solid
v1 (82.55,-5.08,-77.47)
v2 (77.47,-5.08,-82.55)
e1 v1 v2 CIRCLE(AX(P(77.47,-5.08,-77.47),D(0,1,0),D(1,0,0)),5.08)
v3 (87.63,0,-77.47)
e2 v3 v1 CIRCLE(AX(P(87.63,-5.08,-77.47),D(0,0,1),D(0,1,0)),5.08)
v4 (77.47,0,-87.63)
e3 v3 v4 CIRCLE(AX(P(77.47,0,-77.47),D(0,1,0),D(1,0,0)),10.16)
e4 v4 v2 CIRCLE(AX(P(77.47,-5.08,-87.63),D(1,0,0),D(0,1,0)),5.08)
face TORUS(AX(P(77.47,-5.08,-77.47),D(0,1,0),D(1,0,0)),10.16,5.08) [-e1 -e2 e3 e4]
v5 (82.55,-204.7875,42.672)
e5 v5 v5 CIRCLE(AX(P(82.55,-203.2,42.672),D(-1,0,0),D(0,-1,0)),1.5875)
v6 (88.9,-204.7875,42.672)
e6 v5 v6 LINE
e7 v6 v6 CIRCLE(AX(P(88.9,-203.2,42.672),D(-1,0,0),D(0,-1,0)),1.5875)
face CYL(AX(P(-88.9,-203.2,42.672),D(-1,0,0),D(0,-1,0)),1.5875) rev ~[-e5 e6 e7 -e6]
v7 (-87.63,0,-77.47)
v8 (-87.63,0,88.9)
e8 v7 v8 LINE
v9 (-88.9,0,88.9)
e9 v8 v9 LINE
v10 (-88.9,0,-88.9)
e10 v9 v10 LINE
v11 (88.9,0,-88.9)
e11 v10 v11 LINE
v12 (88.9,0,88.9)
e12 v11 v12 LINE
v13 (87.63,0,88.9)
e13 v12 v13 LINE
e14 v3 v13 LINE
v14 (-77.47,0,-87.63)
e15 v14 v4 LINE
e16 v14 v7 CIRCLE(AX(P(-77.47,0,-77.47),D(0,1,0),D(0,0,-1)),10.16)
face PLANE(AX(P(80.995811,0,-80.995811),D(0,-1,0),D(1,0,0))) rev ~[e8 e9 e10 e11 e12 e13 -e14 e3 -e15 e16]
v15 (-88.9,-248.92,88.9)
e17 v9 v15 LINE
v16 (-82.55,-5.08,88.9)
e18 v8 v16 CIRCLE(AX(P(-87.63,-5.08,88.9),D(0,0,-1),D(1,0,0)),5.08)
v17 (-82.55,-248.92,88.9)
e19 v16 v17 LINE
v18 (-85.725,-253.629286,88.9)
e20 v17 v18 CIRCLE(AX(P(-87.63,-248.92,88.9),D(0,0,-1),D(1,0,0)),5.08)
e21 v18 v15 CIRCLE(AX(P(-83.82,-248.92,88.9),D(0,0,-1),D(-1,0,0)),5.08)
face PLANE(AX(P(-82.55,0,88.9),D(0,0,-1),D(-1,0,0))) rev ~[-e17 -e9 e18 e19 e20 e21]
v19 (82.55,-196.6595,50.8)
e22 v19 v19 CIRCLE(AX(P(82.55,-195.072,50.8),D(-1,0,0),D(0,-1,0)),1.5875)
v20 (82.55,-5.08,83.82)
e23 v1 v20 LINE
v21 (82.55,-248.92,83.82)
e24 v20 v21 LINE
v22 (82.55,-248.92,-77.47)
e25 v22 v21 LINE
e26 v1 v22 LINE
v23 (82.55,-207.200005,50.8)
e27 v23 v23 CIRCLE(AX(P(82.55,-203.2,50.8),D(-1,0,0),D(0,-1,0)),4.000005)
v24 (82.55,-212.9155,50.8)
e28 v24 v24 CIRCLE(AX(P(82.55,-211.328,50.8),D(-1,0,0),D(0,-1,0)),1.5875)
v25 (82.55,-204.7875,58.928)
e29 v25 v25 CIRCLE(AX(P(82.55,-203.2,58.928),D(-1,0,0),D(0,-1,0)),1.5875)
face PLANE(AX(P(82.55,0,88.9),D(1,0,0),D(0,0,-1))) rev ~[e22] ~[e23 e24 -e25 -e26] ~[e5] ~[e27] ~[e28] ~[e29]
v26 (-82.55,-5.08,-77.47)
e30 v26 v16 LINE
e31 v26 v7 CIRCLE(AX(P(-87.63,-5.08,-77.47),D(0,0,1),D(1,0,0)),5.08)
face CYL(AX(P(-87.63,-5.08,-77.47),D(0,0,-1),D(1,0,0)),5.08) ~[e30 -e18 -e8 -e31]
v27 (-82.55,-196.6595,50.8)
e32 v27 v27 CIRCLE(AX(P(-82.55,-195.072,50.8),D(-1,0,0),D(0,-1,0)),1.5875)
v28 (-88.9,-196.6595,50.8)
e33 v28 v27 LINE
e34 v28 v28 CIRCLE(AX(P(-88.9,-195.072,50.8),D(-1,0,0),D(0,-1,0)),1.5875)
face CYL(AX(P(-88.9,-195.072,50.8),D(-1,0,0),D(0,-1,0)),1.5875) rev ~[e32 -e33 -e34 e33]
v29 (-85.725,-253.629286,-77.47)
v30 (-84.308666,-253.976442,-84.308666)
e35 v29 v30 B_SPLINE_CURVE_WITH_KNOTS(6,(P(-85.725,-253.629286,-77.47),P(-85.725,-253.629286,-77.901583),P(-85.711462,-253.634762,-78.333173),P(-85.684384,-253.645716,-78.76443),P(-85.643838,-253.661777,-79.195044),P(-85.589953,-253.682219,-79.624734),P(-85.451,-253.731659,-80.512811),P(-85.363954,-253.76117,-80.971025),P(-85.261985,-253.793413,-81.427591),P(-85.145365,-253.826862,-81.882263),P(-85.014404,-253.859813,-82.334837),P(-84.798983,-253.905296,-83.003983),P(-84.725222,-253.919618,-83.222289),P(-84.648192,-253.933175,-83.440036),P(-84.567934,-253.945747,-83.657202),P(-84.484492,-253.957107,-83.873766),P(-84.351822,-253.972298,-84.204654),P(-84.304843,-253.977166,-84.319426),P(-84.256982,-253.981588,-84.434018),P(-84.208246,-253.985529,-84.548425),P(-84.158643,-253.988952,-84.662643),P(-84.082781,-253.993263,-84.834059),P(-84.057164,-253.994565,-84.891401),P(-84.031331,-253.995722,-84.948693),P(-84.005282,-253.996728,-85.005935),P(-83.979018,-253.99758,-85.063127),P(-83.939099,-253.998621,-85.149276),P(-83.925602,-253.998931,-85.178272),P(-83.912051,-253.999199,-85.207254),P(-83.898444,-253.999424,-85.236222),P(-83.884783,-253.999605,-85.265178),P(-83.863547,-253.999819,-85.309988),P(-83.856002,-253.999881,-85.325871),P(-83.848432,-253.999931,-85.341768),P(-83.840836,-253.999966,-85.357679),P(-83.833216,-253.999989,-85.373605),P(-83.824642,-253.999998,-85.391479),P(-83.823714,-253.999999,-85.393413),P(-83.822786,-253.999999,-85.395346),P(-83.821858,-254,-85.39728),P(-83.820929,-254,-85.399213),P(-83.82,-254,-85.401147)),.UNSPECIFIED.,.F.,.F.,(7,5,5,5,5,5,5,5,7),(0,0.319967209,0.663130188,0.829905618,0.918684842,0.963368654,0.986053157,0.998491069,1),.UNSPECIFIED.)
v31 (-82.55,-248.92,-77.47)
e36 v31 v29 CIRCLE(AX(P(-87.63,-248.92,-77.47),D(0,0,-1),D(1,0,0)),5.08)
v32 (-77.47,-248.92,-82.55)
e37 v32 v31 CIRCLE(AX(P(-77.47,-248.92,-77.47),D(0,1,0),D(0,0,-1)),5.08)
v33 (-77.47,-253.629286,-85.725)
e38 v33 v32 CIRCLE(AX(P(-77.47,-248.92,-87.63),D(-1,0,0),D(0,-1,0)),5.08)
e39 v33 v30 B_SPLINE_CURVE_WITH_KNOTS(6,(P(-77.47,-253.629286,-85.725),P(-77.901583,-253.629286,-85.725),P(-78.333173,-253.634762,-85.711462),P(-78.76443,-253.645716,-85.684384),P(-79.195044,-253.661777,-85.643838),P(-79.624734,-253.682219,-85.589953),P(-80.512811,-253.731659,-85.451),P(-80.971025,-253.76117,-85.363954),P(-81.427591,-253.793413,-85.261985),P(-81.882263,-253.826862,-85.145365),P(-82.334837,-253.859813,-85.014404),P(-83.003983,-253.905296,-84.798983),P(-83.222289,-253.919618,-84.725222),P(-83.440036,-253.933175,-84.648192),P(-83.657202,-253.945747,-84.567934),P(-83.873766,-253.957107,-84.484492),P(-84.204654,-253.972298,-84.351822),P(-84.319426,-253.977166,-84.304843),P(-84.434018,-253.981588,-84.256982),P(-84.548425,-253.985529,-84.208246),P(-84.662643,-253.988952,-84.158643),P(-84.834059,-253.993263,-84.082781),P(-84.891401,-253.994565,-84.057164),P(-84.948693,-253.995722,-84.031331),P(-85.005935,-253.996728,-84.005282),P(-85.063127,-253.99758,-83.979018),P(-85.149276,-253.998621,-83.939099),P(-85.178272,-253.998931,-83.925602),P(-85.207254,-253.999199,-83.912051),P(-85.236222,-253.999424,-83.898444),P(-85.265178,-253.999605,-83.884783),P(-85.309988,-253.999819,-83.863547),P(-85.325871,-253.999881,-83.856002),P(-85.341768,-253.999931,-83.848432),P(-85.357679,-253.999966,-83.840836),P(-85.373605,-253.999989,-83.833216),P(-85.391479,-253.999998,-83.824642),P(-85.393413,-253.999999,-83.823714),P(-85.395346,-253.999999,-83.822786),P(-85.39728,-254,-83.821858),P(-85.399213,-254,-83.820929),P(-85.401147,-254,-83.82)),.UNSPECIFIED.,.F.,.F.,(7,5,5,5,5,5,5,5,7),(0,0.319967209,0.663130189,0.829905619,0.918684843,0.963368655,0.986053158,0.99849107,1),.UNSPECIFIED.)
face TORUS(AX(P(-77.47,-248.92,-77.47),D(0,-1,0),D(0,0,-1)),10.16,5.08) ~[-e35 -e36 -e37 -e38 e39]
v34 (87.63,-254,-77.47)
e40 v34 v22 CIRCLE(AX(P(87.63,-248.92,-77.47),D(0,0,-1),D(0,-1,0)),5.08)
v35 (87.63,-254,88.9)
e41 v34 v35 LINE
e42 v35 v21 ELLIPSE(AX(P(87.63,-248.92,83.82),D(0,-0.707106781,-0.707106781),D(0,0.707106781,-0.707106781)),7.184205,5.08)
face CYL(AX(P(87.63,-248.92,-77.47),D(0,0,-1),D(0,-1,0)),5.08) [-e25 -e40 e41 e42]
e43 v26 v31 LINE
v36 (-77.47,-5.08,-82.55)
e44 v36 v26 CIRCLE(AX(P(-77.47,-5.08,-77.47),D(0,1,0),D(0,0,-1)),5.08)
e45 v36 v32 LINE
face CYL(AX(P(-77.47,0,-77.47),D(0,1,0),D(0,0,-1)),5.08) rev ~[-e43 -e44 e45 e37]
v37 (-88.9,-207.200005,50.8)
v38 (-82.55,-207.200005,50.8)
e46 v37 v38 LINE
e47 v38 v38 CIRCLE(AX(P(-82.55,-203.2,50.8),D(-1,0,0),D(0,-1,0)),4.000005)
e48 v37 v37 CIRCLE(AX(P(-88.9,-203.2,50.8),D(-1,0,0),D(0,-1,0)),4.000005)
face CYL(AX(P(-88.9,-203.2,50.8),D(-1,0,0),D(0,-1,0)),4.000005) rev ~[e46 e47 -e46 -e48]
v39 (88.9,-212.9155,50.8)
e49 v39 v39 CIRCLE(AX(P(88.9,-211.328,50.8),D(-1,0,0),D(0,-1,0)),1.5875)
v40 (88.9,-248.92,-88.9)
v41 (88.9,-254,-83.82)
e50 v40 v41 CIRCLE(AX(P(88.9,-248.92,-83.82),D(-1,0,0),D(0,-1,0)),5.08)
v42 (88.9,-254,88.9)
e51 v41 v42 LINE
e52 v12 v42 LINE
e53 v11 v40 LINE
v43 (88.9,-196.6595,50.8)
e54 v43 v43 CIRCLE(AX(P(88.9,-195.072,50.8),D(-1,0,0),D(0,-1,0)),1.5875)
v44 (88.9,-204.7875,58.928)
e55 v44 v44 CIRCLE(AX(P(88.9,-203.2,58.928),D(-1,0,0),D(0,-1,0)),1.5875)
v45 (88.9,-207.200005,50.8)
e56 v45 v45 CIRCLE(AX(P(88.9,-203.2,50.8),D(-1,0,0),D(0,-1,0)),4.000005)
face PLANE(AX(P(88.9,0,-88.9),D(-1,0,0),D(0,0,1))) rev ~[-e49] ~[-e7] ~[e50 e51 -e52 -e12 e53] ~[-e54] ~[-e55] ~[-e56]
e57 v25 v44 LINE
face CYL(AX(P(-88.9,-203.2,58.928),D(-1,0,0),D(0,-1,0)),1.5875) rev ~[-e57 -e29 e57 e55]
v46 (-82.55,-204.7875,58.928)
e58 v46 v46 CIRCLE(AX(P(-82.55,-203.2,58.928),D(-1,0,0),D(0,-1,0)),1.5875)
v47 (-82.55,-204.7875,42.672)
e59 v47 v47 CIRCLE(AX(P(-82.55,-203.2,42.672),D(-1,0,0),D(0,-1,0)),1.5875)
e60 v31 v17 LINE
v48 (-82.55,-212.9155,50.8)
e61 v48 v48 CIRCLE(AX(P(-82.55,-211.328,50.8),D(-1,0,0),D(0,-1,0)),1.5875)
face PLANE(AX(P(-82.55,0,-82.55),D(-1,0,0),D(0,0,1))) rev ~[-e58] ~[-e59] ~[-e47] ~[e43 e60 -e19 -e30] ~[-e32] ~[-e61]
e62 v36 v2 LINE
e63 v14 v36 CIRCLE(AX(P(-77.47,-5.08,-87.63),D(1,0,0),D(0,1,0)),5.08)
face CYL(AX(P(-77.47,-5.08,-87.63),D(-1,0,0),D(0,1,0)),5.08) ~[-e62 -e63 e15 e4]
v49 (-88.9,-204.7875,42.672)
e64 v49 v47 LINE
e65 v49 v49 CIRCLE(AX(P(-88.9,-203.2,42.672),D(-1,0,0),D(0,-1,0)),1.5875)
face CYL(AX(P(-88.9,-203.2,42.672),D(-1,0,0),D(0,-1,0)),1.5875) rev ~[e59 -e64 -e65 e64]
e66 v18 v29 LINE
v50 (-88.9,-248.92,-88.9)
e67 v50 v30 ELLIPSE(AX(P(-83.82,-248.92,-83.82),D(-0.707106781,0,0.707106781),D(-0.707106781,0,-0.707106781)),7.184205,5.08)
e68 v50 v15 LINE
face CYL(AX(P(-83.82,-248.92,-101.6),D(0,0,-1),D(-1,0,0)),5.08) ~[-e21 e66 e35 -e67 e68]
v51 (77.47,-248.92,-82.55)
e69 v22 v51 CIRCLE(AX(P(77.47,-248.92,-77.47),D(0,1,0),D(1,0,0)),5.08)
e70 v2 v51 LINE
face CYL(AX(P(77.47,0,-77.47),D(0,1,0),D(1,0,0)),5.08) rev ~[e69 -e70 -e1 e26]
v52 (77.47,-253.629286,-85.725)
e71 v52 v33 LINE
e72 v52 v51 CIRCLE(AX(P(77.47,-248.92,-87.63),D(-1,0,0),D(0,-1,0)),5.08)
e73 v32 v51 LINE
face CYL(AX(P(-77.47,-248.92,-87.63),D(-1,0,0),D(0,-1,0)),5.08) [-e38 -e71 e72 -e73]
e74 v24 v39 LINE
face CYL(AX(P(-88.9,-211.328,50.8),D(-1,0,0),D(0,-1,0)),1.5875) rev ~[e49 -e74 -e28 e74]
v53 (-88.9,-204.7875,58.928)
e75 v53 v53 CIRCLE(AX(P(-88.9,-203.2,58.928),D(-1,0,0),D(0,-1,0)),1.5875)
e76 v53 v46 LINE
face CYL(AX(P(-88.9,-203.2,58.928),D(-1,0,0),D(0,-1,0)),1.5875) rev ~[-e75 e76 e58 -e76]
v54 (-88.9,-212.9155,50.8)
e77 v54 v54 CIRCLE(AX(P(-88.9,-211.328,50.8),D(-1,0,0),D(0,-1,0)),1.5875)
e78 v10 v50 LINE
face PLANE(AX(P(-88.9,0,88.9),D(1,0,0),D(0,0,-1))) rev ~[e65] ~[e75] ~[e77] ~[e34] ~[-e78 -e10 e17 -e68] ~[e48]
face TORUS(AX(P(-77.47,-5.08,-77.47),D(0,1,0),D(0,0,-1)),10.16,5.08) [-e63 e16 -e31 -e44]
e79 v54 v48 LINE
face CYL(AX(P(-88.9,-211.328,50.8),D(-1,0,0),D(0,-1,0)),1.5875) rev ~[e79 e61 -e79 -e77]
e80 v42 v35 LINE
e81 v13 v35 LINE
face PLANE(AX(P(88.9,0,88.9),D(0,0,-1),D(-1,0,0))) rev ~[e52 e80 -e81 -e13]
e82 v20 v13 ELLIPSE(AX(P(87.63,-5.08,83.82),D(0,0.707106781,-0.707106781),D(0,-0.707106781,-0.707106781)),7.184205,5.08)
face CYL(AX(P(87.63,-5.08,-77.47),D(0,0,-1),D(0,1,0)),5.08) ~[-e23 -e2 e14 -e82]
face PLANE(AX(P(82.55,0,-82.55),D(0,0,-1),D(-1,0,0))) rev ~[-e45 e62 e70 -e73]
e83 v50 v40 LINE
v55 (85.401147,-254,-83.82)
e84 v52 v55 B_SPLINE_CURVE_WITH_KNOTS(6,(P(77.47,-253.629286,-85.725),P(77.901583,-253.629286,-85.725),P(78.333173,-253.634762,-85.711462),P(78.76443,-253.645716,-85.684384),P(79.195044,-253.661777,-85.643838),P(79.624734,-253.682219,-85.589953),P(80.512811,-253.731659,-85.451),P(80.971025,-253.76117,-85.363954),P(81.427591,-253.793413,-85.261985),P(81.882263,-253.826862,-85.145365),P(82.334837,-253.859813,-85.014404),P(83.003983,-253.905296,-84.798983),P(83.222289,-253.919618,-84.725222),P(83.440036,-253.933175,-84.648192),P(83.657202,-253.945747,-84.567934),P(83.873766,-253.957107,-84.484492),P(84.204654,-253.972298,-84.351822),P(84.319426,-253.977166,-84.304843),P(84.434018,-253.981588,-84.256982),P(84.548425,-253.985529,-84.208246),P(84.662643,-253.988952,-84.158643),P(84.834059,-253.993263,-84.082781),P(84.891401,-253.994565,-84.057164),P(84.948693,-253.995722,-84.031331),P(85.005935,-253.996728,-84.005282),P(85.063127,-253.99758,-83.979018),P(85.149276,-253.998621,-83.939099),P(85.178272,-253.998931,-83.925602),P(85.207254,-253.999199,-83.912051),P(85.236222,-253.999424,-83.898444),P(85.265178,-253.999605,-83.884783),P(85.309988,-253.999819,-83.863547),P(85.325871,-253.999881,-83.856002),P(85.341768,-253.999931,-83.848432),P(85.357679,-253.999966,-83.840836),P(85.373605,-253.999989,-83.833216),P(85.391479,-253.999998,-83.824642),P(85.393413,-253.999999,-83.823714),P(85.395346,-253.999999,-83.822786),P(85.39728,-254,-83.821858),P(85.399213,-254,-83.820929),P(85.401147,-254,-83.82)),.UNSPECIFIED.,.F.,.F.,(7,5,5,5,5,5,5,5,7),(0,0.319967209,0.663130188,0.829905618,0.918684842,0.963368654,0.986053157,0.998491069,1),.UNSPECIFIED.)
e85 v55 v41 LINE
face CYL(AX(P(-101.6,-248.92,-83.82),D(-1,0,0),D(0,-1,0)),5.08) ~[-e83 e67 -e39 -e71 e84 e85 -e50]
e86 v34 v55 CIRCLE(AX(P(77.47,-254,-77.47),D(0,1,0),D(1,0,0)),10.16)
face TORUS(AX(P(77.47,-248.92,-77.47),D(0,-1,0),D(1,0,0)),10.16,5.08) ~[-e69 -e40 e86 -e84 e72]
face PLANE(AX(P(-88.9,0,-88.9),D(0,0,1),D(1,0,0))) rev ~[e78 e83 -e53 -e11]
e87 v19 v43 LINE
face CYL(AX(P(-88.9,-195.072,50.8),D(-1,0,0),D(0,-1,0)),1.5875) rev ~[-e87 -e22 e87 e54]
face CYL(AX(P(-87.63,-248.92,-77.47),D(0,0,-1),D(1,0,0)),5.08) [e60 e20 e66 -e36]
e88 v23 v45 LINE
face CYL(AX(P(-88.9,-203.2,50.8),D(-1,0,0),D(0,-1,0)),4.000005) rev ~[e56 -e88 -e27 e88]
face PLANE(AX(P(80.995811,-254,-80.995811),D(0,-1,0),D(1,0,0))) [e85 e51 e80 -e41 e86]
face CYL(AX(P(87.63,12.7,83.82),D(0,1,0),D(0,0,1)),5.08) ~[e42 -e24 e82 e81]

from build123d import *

# Parameters (mm, degrees)
F1_DEPTH     = 254
F2_T1_DEPTH  = 254
F2_T3_DEPTH  = 203.2
F2_T5_DEPTH  = 179.07
F2_T7_DEPTH  = 279.4
F2_T9_DEPTH  = 154.94
F2_T11_DEPTH = 203.2
F2_T14_ANGLE = 90
F2_T16_ANGLE = 90
F2_T18_ANGLE = 90
F2_T20_ANGLE = 90
F3_R         = 4.0000047
F3_R_2       = 1.5875
F4_DEPTH     = 203.2


# Not quite as in the source:
# - a fillet or chamfer that OpenCascade refuses, or shapes differently, is made with other operations: its cross-section is extruded or revolved along the edge and cut away or added


with BuildPart() as f1:
    # F0 (on Front) → F1 (new body)
    with BuildSketch(Plane.XZ):
        Polygon((-88.9, -88.9), (88.9, -88.9), (88.9, 88.9), (82.55, 88.9), (82.55, -82.55), (-82.55, -82.55), (-82.55, 88.9), (-88.9, 88.9), align=None)
    extrude(amount=F1_DEPTH)

    # F2: fillet of radius 5.08 on 11 edges, made by hand

    # F2_s2 → F2_t1 (join)
    with BuildSketch(Plane.XZ):
        with BuildLine():
            ThreePointArc((82.55, -77.47), (81.0621024484, -81.0621024484), (77.47, -82.55))
            Line((77.47, -82.55), (82.55, -82.55))
            Line((82.55, -82.55), (82.55, -77.47))
        make_face()
        with BuildLine():
            ThreePointArc((-77.47, -82.55), (-81.0621024484, -81.0621024484), (-82.55, -77.47))
            Line((-82.55, -77.47), (-82.55, -82.55))
            Line((-82.55, -82.55), (-77.47, -82.55))
        make_face()
    extrude(amount=F2_T1_DEPTH)

    # F2_s4 → F2_t3 (cut)
    with BuildSketch(Plane.YZ.offset(-101.6)):
        with BuildLine():
            ThreePointArc((-254, -83.82), (-252.5121024484, -87.4121024484), (-248.92, -88.9))
            Line((-248.92, -88.9), (-254, -88.9))
            Line((-254, -88.9), (-254, -83.82))
        make_face()
    extrude(amount=F2_T3_DEPTH, mode=Mode.SUBTRACT)

    # F2_s6 → F2_t5 (cut)
    with BuildSketch(Plane.XY.offset(-77.47)):
        with BuildLine():
            ThreePointArc((-82.55, -248.92), (-84.0378975516, -252.5121024484), (-87.63, -254))
            Line((-87.63, -254), (-82.55, -254))
            Line((-82.55, -254), (-82.55, -248.92))
        make_face()
        with BuildLine():
            ThreePointArc((87.63, 0), (84.0378975516, -1.4878975516), (82.55, -5.08))
            Line((82.55, -5.08), (82.55, 0))
            Line((82.55, 0), (87.63, 0))
        make_face()
        with BuildLine():
            ThreePointArc((87.63, -254), (84.0378975516, -252.5121024484), (82.55, -248.92))
            Line((82.55, -248.92), (82.55, -254))
            Line((82.55, -254), (87.63, -254))
        make_face()
        with BuildLine():
            ThreePointArc((-82.55, -5.08), (-84.0378975516, -1.4878975516), (-87.63, 0))
            Line((-87.63, 0), (-82.55, 0))
            Line((-82.55, 0), (-82.55, -5.08))
        make_face()
    extrude(amount=F2_T5_DEPTH, mode=Mode.SUBTRACT)

    # F2_s8 → F2_t7 (cut)
    with BuildSketch(Plane.XZ.offset(-12.7)):
        with BuildLine():
            ThreePointArc((87.63, 88.9), (84.0378975516, 87.4121024484), (82.55, 83.82))
            Line((82.55, 83.82), (82.55, 88.9))
            Line((82.55, 88.9), (87.63, 88.9))
        make_face()
    extrude(amount=F2_T7_DEPTH, mode=Mode.SUBTRACT)

    # F2_s10 → F2_t9 (cut)
    with BuildSketch(Plane.YZ.offset(-77.47)):
        with BuildLine():
            ThreePointArc((0, -87.63), (-1.4878975516, -84.0378975516), (-5.08, -82.55))
            Line((-5.08, -82.55), (0, -82.55))
            Line((0, -82.55), (0, -87.63))
        make_face()
        with BuildLine():
            ThreePointArc((-254, -87.63), (-252.5121024484, -84.0378975516), (-248.92, -82.55))
            Line((-248.92, -82.55), (-254, -82.55))
            Line((-254, -82.55), (-254, -87.63))
        make_face()
    extrude(amount=F2_T9_DEPTH, mode=Mode.SUBTRACT)

    # F2_s12 → F2_t11 (cut)
    with BuildSketch(Plane.XY.offset(-101.6)):
        with BuildLine():
            ThreePointArc((-88.9, -248.92), (-87.4121024484, -252.5121024484), (-83.82, -254))
            Line((-83.82, -254), (-88.9, -254))
            Line((-88.9, -254), (-88.9, -248.92))
        make_face()
    extrude(amount=F2_T11_DEPTH, mode=Mode.SUBTRACT)

    # F2_s13 → F2_t14 (revolve, cut)
    with BuildSketch(Plane.YZ.offset(-77.47)):
        with BuildLine():
            ThreePointArc((0, -87.63), (-1.4878975516, -84.0378975516), (-5.08, -82.55))
            Line((-5.08, -82.55), (0, -82.55))
            Line((0, -82.55), (0, -87.63))
        make_face()
    revolve(axis=Axis((-77.47, 0, -77.47), (0, 1, 0)), revolution_arc=F2_T14_ANGLE, mode=Mode.SUBTRACT)

    # F2_s15 → F2_t16 (revolve, cut)
    with BuildSketch(Plane.XY.offset(-77.47)):
        with BuildLine():
            ThreePointArc((87.63, -254), (84.0378975516, -252.5121024484), (82.55, -248.92))
            Line((82.55, -248.92), (82.55, -254))
            Line((82.55, -254), (87.63, -254))
        make_face()
    revolve(axis=Axis((77.47, -254, -77.47), (0, 1, 0)), revolution_arc=F2_T16_ANGLE, mode=Mode.SUBTRACT)

    # F2_s17 → F2_t18 (revolve, cut)
    with BuildSketch(Plane.YZ.offset(-77.47)):
        with BuildLine():
            ThreePointArc((-254, -87.63), (-252.5121024484, -84.0378975516), (-248.92, -82.55))
            Line((-248.92, -82.55), (-254, -82.55))
            Line((-254, -82.55), (-254, -87.63))
        make_face()
    revolve(axis=Axis((-77.47, -254, -77.47), (0, 1, 0)), revolution_arc=F2_T18_ANGLE, mode=Mode.SUBTRACT)

    # F2_s19 → F2_t20 (revolve, cut)
    with BuildSketch(Plane.XY.offset(-77.47)):
        with BuildLine():
            ThreePointArc((87.63, 0), (84.0378975516, -1.4878975516), (82.55, -5.08))
            Line((82.55, -5.08), (82.55, 0))
            Line((82.55, 0), (87.63, 0))
        make_face()
    revolve(axis=Axis((77.47, 0, -77.47), (0, 1, 0)), revolution_arc=F2_T20_ANGLE, mode=Mode.SUBTRACT)

    # F3 (on face) → F4 (cut)
    with BuildSketch(Plane(origin=(-88.9, 0, 0), x_dir=(0, -1, 0), z_dir=(-1, 0, 0))):
        with Locations((203.2, 50.8)):
            Circle(F3_R)
        with Locations((211.328, 50.8)):
            Circle(F3_R_2)
        with Locations((203.2, 42.672)):
            Circle(F3_R_2)
        with Locations((195.072, 50.8)):
            Circle(F3_R_2)
        with Locations((203.2, 58.928)):
            Circle(F3_R_2)
    extrude(amount=-F4_DEPTH, mode=Mode.SUBTRACT)


solid = f1.part
